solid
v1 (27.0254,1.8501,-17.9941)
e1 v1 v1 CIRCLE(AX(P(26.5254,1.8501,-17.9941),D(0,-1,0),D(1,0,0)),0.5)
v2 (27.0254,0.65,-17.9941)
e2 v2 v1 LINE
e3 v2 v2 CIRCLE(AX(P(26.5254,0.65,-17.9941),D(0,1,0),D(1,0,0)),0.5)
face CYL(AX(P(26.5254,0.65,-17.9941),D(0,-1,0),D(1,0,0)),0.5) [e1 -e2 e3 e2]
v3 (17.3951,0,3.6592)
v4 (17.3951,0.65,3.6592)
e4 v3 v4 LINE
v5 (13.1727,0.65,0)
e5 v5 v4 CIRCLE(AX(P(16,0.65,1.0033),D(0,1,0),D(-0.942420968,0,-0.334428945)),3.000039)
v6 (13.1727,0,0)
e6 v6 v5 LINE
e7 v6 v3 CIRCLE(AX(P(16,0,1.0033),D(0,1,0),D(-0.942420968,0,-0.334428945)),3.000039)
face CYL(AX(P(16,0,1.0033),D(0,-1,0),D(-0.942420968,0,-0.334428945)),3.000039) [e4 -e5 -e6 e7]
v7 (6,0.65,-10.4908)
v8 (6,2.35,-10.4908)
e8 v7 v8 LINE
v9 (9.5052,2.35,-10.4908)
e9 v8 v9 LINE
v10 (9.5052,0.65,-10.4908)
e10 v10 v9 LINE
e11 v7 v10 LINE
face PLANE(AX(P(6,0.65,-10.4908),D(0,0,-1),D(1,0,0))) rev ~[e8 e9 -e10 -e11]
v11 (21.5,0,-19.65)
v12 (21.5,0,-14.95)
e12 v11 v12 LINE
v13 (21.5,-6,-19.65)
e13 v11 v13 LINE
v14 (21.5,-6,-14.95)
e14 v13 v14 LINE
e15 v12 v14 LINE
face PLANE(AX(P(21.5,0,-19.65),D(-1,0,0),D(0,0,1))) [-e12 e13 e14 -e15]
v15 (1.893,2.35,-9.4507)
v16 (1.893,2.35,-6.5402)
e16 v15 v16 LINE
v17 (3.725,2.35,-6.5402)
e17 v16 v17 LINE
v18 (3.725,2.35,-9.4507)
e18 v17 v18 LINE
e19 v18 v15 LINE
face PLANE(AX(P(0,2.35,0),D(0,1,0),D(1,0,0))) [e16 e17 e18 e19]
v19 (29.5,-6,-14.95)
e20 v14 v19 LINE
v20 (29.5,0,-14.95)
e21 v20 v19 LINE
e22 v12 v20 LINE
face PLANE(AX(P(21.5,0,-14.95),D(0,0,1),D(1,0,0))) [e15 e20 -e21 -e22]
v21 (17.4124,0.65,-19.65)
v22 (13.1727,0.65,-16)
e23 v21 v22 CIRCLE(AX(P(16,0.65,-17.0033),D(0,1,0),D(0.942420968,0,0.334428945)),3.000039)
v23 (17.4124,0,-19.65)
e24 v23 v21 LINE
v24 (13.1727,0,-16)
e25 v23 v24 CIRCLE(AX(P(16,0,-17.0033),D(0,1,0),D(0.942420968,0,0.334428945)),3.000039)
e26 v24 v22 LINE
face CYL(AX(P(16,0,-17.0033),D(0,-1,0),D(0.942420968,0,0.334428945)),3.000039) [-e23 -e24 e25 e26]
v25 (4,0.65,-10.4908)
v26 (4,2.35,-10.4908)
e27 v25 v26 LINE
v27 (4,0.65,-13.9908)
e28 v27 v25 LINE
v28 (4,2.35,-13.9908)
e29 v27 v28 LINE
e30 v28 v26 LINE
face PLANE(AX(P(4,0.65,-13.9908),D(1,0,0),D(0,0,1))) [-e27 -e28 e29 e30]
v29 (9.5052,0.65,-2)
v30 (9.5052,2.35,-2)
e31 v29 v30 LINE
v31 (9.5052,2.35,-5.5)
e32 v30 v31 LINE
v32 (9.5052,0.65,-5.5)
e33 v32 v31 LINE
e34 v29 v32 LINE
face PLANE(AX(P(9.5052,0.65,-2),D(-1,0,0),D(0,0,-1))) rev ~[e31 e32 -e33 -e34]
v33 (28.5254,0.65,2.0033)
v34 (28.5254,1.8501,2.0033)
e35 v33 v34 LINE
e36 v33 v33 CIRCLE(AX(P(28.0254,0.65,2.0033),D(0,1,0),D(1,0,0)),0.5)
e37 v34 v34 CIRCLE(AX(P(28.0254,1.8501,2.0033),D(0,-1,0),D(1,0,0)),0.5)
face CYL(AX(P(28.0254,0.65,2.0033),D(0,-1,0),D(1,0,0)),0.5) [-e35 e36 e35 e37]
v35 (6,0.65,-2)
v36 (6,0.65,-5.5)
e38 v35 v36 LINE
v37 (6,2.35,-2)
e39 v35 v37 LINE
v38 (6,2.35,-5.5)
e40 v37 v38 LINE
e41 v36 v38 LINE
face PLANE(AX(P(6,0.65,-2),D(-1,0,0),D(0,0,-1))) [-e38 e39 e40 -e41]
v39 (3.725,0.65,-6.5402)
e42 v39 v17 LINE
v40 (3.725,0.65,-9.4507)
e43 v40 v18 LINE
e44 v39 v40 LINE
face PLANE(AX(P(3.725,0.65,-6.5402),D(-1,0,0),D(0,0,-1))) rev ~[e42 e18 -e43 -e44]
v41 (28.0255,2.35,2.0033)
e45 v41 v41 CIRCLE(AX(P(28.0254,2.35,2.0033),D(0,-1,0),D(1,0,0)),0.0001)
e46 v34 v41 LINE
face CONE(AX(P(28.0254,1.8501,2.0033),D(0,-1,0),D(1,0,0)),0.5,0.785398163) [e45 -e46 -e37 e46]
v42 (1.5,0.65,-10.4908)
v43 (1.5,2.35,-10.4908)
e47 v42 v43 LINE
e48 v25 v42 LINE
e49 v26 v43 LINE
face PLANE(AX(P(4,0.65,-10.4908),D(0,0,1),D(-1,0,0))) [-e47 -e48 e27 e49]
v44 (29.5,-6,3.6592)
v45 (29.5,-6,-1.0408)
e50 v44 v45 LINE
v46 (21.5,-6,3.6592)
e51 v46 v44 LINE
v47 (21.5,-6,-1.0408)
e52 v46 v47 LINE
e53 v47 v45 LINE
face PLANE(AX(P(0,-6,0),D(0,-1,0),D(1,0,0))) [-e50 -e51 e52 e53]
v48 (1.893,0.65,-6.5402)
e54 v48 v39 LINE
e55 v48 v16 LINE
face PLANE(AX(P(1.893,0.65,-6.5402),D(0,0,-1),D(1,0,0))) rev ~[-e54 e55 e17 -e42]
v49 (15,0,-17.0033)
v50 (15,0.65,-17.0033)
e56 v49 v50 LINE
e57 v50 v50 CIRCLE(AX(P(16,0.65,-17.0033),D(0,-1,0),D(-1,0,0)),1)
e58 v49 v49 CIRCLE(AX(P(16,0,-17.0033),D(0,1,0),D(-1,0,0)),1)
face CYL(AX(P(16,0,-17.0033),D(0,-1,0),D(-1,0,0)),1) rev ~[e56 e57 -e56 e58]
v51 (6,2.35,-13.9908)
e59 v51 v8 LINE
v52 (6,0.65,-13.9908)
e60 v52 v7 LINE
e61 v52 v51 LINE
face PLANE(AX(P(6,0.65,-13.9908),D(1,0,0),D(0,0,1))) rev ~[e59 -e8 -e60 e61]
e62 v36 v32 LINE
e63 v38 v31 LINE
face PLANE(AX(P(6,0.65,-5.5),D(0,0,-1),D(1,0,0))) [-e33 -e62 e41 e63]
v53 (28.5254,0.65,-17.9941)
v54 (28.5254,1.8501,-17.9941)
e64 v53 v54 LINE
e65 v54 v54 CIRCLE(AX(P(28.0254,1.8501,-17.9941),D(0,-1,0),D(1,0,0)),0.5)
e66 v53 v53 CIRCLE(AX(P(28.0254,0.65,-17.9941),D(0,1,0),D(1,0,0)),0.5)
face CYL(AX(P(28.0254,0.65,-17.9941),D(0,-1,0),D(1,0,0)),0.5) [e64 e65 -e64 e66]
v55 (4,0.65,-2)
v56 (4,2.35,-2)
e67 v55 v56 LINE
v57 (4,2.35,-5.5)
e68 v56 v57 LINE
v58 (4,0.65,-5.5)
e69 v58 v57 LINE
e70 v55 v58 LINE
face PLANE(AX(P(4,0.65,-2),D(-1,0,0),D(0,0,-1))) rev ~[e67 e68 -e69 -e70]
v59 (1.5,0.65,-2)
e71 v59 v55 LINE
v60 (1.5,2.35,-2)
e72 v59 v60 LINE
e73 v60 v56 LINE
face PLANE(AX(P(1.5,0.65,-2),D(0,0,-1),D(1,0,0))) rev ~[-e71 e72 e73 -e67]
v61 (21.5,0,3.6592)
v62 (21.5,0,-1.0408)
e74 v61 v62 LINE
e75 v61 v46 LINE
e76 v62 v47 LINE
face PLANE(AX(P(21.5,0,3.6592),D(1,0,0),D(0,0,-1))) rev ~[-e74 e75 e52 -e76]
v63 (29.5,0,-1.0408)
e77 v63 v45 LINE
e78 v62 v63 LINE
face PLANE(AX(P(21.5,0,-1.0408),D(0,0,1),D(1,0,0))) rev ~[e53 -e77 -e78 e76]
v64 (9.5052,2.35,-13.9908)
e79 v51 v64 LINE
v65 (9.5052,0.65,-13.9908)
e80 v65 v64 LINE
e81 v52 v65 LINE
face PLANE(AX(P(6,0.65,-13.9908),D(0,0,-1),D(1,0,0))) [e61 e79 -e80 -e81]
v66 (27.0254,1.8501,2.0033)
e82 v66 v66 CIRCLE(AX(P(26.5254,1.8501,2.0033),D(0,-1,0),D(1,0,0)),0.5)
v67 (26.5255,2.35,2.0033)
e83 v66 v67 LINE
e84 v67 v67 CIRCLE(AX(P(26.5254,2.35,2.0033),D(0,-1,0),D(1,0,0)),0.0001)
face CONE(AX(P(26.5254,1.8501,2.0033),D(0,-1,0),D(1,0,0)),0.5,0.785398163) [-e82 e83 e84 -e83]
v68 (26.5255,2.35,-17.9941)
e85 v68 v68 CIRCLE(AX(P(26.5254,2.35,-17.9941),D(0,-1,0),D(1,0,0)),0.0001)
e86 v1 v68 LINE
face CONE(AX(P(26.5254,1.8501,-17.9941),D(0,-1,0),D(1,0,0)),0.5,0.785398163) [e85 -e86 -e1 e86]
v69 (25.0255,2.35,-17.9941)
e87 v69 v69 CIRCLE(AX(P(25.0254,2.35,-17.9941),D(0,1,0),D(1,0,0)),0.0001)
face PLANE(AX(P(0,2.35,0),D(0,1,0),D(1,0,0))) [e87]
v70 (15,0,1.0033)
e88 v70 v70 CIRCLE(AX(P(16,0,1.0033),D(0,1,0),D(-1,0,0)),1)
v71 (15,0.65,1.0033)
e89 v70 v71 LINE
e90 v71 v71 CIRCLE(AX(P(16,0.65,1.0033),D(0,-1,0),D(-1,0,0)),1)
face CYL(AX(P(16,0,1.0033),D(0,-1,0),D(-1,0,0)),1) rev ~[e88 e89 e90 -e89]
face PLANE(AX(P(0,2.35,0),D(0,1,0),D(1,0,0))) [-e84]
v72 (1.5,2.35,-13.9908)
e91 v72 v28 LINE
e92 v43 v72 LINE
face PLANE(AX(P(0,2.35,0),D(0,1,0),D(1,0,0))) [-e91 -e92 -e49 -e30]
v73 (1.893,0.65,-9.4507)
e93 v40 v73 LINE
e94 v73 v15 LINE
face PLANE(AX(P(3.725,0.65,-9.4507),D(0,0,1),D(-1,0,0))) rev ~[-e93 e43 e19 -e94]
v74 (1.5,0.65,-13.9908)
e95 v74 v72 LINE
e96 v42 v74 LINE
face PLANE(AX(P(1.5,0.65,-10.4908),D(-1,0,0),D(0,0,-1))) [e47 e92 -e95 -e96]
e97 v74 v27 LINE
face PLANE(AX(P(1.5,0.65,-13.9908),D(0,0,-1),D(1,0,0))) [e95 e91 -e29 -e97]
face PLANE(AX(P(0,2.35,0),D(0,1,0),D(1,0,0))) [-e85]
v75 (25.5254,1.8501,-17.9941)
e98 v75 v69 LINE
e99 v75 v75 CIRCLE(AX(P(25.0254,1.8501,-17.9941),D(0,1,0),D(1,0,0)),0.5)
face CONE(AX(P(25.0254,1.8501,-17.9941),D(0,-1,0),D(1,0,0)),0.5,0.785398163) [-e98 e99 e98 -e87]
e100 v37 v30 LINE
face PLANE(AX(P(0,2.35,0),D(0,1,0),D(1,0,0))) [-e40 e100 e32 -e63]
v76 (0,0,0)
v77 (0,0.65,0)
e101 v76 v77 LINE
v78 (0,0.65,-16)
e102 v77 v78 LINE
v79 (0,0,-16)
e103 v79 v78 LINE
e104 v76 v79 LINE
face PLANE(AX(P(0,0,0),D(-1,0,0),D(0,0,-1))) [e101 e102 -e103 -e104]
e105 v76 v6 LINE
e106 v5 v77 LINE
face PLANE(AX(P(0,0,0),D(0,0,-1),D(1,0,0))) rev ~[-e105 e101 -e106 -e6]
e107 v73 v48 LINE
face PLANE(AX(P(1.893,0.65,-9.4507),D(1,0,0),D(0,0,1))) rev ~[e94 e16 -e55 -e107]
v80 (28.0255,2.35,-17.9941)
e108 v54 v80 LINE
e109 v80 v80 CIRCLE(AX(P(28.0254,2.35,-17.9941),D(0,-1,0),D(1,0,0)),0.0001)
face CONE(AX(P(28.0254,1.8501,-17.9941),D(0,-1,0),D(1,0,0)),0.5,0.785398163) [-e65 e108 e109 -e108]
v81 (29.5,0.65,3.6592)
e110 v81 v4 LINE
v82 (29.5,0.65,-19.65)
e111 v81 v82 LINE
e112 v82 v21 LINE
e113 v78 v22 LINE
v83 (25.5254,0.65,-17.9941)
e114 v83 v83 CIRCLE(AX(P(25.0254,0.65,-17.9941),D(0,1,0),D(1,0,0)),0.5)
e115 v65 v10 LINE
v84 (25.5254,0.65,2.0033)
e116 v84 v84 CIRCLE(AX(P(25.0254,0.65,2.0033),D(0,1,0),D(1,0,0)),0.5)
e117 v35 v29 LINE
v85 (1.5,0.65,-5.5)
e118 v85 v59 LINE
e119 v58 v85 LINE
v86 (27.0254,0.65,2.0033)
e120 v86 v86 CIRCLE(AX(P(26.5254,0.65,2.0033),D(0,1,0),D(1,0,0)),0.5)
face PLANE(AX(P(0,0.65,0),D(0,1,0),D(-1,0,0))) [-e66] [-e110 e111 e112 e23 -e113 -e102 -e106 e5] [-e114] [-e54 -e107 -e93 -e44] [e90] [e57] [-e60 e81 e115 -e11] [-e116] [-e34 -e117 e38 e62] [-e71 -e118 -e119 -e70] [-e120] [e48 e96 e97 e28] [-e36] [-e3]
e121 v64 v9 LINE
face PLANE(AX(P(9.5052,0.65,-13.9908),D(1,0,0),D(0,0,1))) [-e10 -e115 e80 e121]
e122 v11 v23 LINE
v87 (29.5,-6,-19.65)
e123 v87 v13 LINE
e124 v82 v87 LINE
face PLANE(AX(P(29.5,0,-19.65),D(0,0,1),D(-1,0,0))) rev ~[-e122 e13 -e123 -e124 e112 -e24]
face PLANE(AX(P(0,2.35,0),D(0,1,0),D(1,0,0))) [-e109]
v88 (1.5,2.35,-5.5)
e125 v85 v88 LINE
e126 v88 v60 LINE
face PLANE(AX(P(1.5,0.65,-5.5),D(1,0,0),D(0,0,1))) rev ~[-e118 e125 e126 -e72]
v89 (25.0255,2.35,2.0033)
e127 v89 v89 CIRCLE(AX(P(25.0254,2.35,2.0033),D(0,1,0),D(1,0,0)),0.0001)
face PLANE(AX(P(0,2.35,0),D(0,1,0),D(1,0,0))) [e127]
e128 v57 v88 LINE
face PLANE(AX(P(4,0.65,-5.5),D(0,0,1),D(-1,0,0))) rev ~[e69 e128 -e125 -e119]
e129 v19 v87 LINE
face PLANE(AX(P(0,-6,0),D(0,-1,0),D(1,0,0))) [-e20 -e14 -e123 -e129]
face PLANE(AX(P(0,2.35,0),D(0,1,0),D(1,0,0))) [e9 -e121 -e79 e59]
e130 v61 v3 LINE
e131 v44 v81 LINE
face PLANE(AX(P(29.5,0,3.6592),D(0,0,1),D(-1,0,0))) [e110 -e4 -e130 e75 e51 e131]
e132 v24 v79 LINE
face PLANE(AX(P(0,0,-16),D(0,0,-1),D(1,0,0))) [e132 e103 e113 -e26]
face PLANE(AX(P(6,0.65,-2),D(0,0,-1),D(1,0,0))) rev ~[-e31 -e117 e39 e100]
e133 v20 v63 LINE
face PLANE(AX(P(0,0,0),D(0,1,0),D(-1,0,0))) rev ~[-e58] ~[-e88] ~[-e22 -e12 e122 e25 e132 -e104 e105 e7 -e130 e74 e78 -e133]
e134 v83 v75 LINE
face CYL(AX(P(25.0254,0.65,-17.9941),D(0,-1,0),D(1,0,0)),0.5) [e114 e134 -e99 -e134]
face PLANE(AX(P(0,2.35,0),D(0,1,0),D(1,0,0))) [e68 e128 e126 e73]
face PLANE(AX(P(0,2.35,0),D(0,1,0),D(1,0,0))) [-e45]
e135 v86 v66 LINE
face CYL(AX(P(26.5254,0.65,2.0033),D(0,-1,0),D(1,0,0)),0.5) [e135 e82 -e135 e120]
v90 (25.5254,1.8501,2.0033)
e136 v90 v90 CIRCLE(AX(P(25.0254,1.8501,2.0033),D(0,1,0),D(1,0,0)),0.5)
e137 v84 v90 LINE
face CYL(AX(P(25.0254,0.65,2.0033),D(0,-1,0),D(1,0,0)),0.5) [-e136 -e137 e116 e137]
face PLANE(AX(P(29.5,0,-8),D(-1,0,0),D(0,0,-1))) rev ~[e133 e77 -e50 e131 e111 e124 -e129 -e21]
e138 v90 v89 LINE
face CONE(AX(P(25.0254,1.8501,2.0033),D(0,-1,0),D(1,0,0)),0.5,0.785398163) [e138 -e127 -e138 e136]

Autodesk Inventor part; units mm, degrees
ref_plane "YZ Plane" through (0, 0, 0) normal (1, 0, 0) x (0, 1, 0)
ref_plane "XZ Plane" through (0, 0, 0) normal (0, 1, 0) x (-1, 0, 0)
ref_plane "XY Plane" through (0, 0, 0) normal (0, 0, 1) x (1, 0, 0)
sketch "Sketch1" plane through (0, 0, 0) normal (0, 1, 0) x (-1, 0, 0)
  line L0 (0, 0) -> (0, -16)
  line L1 (0, -16) -> (-13, -16)
  circle A0 centre (48.4003, -12.7173) radius 1 projected
  circle A1 centre (48.4003, 5.2827) radius 1 projected
  line L2 (0, 0) -> (-13, 0)
  line L3 (-16, 0) -> (-16, 1.0033)
  line L4 (-16, -16) -> (-16, -17.0033)
  circle A2 centre (-16, 1.0033) radius 1
  circle A3 centre (-16, -17.0033) radius 1
  arc A4 (-18.8273, -16) -> (-13.1727, -16) centre (-16, -17.0033) ccw
  arc A5 (-13.1727, 0) -> (-18.8273, 0) centre (-16, 1.0033) ccw
  line L5 (-19, 0) -> (-29.5, 0)
  line L6 (-19, -16) -> (-29.5, -16)
  line L7 (-29.5, 0) -> (-29.5, -16)
  line L8 (-29.5, -8) -> (-29.5, -19.65)
  line L9 (-29.5, -8) -> (-29.5, 3.6592)
  line L10 (-29.5, 3.6592) -> (-17.3951, 3.6592)
  line L11 (-29.5, -19.65) -> (-17.4124, -19.65)
  line L12 (-13, 0) -> (-13.1727, 0)
  line L13 (-18.8273, 0) -> (-19, 0)
  line L14 (-13, -16) -> (-13.1727, -16)
  line L15 (-18.8273, -16) -> (-19, -16)
  dimension "d0" = 16
  dimension "d1" = 13
  dimension "d2" = 6
  dimension "d3" = 1.0033
  dimension "d4" = 1.0033
  dimension "d5" = 2
  dimension "d6" = 2
  dimension "d7" = 6
  dimension "d8" = 6
  dimension "d9" = 6
  dimension "d10" = 13
  dimension "d11" = 10.5
  dimension "d12" = 11.65
extrude "Extrusion1" add sketch "Sketch1" along normal blind 0.65 contours L0 L1 L14 A4 L15 L6 L7 L5 L13 A5 L12 L2 | A5 L13 L5 L9 L10 | L11 L8 L6 L15 A4
sketch "Sketch2" plane through (0, 0.65, 0) normal (0, 1, 0) x (1, 0, 0)
  line L0 (0, 0) -> (13.1727, 0) projected
  circle A0 centre (16, -1.0033) radius 1 projected
  circle A1 centre (16, 17.0033) radius 1 projected
  line L1 (17.3951, -3.6592) -> (29.5, -3.6592) projected
  line L2 (29.5, -3.6592) -> (29.5, 19.65) projected
  line L3 (29.5, 19.65) -> (17.4124, 19.65) projected
  arc A2 (17.4124, 19.65) -> (13.1727, 16) centre (16, 17.0033) ccw projected
  line L4 (13.1727, 16) -> (0, 16) projected
  line L5 (0, 16) -> (0, 0) projected
  line L6 (0, 0) -> (13.1727, 0) projected
  arc A3 (13.1727, 0) -> (17.3951, -3.6592) centre (16, -1.0033) ccw projected
  line L7 (0, 0) -> (1.5, 0)
  line L8 (1.5, 0) -> (1.5, 2)
  line L9 (1.5, 2) -> (0, 2)
  line L10 (0, 2) -> (0, 0)
  line L11 (1.5, 2) -> (4, 2)
  line L12 (4, 2) -> (4, 5.5)
  line L13 (4, 5.5) -> (1.5, 5.5)
  line L14 (1.5, 5.5) -> (1.5, 2)
  line L15 (4, 2) -> (6, 2)
  line L16 (4, 2) -> (6, 2) construction
  line L17 (6, 2) -> (6, 5.5)
  line L18 (6, 5.5) -> (9.5052, 5.5)
  line L19 (6, 2) -> (9.5052, 2)
  line L20 (9.5052, 2) -> (9.5052, 5.5)
  line L21 (9.5052, 5.5) -> (6, 5.5)
  line L22 (6, 5.5) -> (6, 2)
  circle A4 centre (28.0254, -2.0033) radius 0.5
  circle A5 centre (26.5254, -2.0033) radius 0.5
  line L23 (26.5254, -2.0033) -> (28.0254, -2.0033)
  line L24 (26.5254, -2.0033) -> (25.0254, -2.0033)
  circle A6 centre (25.0254, -2.0033) radius 0.5
  line L25 (29.5, 7.9954) -> (27.2754, 7.9954)
  line L26 (1.5, 15.9908) -> (1.5, 13.9908)
  line L27 (1.5, 13.9908) -> (0, 13.9908)
  line L28 (1.5, 13.9908) -> (4, 13.9908)
  line L29 (4, 13.9908) -> (4, 10.4908)
  line L30 (4, 10.4908) -> (1.5, 10.4908)
  line L31 (1.5, 10.4908) -> (1.5, 13.9908)
  line L32 (4, 13.9908) -> (6, 13.9908)
  line L33 (4, 13.9908) -> (6, 13.9908) construction
  line L34 (6, 13.9908) -> (6, 10.4908)
  line L35 (6, 10.4908) -> (9.5052, 10.4908)
  line L36 (6, 13.9908) -> (9.5052, 13.9908)
  line L37 (9.5052, 13.9908) -> (9.5052, 10.4908)
  line L38 (9.5052, 10.4908) -> (6, 10.4908)
  line L39 (6, 10.4908) -> (6, 13.9908)
  circle A7 centre (28.0254, 17.9941) radius 0.5
  circle A8 centre (26.5254, 17.9941) radius 0.5
  line L40 (26.5254, 17.9941) -> (28.0254, 17.9941)
  line L41 (26.5254, 17.9941) -> (25.0254, 17.9941)
  circle A9 centre (25.0254, 17.9941) radius 0.5
  line L42 (1.893, 6.5402) -> (3.725, 6.5402)
  line L43 (3.725, 6.5402) -> (3.725, 9.4507)
  line L44 (3.725, 9.4507) -> (1.893, 9.4507)
  line L45 (1.893, 9.4507) -> (1.893, 6.5402)
  dimension "d15" = 1.5
  dimension "d16" = 2
  dimension "d17" = 2.5
  dimension "d18" = 3.5
  dimension "d19" = 2
  dimension "d20" = 0
  dimension "d21" = 3.5052
  dimension "d22" = 90
  dimension "d23" = 1
  dimension "d24" = 1
  dimension "d25" = 1.5
  dimension "d26" = 1.5
  dimension "d27" = 1
  dimension "d33" = 1.0402
  dimension "d34" = 1.0402
extrude "Extrusion2" add sketch "Sketch2" along normal blind 1.7 contours L14 L13 L12 L11 | L17 L18 L20 L19 | A4 | L23 L24 A5 | A5 L24 L23 | A6 | L28 L29 L30 L31 | L36 L37 L35 L34 | A7 | L40 L41 A8 | A8 L41 L40 | A9 | L45 L44 L43 L42
chamfer "Chamfer1" distance 0.5 angle 45 6 edges at (27.5254, 2.35, -17.9941) (26.0254, 2.35, -17.9941) (24.5254, 2.35, -17.9941) (27.5254, 2.35, 2.0033) (26.0254, 2.35, 2.0033) (24.5254, 2.35, 2.0033)
sketch "Sketch3" plane through (0, 0, 0) normal (0, -1, 0) x (1, 0, 0)
  circle A0 centre (16, -17.0033) radius 1 projected
  circle A1 centre (16, 1.0033) radius 1 projected
  line L0 (29.5, 3.6592) -> (29.5, -19.65) projected
  line L1 (17.3951, 3.6592) -> (29.5, 3.6592) projected
  arc A2 (17.3951, 3.6592) -> (13.1727, 0) centre (16, 1.0033) ccw projected
  line L2 (0, 0) -> (13.1727, 0) projected
  line L3 (0, -16) -> (0, 0) projected
  line L4 (13.1727, -16) -> (0, -16) projected
  arc A3 (13.1727, -16) -> (17.4124, -19.65) centre (16, -17.0033) ccw projected
  line L5 (29.5, -19.65) -> (17.4124, -19.65) projected
  line L6 (0, -16) -> (8, -16)
  line L7 (8, -16) -> (8, -11.3)
  line L8 (8, -11.3) -> (0, -11.3)
  line L9 (0, -11.3) -> (0, -16)
  line L10 (0, -16) -> (0, 0) projected
  line L11 (0, -8) -> (1.7097, -8)
  line L12 (0, 0) -> (0, -16)
  line L13 (13.1727, 0) -> (0, 0)
  line L14 (0, 0) -> (8, 0)
  line L15 (8, 0) -> (8, -4.7)
  line L16 (8, -4.7) -> (0, -4.7)
  line L17 (0, -4.7) -> (0, 0)
  line L18 (0, 0) -> (0, -16)
  line L19 (29.5, 3.6592) -> (29.5, -19.65) projected
  line L20 (29.5, -19.65) -> (21.5, -19.65)
  line L21 (21.5, -19.65) -> (21.5, -14.95)
  line L22 (21.5, -14.95) -> (29.5, -14.95)
  line L23 (29.5, -14.95) -> (29.5, -19.65)
  line L24 (29.5, 3.6592) -> (21.5, 3.6592)
  line L25 (21.5, 3.6592) -> (21.5, -1.0408)
  line L26 (21.5, -1.0408) -> (29.5, -1.0408)
  line L27 (29.5, -1.0408) -> (29.5, 3.6592)
  dimension "d35" = 8
  dimension "d36" = 4.7
  dimension "d39" = 8
  dimension "d40" = 4.7
  dimension "d41" = 8
  dimension "d42" = 4.7
extrude "Extrusion3" add sketch "Sketch3" along normal blind 6 contours L0 L26 L25 L1 | L0 L5 L21 L22
equation "\"d34\" = d33"
properties part number "Encoder"
